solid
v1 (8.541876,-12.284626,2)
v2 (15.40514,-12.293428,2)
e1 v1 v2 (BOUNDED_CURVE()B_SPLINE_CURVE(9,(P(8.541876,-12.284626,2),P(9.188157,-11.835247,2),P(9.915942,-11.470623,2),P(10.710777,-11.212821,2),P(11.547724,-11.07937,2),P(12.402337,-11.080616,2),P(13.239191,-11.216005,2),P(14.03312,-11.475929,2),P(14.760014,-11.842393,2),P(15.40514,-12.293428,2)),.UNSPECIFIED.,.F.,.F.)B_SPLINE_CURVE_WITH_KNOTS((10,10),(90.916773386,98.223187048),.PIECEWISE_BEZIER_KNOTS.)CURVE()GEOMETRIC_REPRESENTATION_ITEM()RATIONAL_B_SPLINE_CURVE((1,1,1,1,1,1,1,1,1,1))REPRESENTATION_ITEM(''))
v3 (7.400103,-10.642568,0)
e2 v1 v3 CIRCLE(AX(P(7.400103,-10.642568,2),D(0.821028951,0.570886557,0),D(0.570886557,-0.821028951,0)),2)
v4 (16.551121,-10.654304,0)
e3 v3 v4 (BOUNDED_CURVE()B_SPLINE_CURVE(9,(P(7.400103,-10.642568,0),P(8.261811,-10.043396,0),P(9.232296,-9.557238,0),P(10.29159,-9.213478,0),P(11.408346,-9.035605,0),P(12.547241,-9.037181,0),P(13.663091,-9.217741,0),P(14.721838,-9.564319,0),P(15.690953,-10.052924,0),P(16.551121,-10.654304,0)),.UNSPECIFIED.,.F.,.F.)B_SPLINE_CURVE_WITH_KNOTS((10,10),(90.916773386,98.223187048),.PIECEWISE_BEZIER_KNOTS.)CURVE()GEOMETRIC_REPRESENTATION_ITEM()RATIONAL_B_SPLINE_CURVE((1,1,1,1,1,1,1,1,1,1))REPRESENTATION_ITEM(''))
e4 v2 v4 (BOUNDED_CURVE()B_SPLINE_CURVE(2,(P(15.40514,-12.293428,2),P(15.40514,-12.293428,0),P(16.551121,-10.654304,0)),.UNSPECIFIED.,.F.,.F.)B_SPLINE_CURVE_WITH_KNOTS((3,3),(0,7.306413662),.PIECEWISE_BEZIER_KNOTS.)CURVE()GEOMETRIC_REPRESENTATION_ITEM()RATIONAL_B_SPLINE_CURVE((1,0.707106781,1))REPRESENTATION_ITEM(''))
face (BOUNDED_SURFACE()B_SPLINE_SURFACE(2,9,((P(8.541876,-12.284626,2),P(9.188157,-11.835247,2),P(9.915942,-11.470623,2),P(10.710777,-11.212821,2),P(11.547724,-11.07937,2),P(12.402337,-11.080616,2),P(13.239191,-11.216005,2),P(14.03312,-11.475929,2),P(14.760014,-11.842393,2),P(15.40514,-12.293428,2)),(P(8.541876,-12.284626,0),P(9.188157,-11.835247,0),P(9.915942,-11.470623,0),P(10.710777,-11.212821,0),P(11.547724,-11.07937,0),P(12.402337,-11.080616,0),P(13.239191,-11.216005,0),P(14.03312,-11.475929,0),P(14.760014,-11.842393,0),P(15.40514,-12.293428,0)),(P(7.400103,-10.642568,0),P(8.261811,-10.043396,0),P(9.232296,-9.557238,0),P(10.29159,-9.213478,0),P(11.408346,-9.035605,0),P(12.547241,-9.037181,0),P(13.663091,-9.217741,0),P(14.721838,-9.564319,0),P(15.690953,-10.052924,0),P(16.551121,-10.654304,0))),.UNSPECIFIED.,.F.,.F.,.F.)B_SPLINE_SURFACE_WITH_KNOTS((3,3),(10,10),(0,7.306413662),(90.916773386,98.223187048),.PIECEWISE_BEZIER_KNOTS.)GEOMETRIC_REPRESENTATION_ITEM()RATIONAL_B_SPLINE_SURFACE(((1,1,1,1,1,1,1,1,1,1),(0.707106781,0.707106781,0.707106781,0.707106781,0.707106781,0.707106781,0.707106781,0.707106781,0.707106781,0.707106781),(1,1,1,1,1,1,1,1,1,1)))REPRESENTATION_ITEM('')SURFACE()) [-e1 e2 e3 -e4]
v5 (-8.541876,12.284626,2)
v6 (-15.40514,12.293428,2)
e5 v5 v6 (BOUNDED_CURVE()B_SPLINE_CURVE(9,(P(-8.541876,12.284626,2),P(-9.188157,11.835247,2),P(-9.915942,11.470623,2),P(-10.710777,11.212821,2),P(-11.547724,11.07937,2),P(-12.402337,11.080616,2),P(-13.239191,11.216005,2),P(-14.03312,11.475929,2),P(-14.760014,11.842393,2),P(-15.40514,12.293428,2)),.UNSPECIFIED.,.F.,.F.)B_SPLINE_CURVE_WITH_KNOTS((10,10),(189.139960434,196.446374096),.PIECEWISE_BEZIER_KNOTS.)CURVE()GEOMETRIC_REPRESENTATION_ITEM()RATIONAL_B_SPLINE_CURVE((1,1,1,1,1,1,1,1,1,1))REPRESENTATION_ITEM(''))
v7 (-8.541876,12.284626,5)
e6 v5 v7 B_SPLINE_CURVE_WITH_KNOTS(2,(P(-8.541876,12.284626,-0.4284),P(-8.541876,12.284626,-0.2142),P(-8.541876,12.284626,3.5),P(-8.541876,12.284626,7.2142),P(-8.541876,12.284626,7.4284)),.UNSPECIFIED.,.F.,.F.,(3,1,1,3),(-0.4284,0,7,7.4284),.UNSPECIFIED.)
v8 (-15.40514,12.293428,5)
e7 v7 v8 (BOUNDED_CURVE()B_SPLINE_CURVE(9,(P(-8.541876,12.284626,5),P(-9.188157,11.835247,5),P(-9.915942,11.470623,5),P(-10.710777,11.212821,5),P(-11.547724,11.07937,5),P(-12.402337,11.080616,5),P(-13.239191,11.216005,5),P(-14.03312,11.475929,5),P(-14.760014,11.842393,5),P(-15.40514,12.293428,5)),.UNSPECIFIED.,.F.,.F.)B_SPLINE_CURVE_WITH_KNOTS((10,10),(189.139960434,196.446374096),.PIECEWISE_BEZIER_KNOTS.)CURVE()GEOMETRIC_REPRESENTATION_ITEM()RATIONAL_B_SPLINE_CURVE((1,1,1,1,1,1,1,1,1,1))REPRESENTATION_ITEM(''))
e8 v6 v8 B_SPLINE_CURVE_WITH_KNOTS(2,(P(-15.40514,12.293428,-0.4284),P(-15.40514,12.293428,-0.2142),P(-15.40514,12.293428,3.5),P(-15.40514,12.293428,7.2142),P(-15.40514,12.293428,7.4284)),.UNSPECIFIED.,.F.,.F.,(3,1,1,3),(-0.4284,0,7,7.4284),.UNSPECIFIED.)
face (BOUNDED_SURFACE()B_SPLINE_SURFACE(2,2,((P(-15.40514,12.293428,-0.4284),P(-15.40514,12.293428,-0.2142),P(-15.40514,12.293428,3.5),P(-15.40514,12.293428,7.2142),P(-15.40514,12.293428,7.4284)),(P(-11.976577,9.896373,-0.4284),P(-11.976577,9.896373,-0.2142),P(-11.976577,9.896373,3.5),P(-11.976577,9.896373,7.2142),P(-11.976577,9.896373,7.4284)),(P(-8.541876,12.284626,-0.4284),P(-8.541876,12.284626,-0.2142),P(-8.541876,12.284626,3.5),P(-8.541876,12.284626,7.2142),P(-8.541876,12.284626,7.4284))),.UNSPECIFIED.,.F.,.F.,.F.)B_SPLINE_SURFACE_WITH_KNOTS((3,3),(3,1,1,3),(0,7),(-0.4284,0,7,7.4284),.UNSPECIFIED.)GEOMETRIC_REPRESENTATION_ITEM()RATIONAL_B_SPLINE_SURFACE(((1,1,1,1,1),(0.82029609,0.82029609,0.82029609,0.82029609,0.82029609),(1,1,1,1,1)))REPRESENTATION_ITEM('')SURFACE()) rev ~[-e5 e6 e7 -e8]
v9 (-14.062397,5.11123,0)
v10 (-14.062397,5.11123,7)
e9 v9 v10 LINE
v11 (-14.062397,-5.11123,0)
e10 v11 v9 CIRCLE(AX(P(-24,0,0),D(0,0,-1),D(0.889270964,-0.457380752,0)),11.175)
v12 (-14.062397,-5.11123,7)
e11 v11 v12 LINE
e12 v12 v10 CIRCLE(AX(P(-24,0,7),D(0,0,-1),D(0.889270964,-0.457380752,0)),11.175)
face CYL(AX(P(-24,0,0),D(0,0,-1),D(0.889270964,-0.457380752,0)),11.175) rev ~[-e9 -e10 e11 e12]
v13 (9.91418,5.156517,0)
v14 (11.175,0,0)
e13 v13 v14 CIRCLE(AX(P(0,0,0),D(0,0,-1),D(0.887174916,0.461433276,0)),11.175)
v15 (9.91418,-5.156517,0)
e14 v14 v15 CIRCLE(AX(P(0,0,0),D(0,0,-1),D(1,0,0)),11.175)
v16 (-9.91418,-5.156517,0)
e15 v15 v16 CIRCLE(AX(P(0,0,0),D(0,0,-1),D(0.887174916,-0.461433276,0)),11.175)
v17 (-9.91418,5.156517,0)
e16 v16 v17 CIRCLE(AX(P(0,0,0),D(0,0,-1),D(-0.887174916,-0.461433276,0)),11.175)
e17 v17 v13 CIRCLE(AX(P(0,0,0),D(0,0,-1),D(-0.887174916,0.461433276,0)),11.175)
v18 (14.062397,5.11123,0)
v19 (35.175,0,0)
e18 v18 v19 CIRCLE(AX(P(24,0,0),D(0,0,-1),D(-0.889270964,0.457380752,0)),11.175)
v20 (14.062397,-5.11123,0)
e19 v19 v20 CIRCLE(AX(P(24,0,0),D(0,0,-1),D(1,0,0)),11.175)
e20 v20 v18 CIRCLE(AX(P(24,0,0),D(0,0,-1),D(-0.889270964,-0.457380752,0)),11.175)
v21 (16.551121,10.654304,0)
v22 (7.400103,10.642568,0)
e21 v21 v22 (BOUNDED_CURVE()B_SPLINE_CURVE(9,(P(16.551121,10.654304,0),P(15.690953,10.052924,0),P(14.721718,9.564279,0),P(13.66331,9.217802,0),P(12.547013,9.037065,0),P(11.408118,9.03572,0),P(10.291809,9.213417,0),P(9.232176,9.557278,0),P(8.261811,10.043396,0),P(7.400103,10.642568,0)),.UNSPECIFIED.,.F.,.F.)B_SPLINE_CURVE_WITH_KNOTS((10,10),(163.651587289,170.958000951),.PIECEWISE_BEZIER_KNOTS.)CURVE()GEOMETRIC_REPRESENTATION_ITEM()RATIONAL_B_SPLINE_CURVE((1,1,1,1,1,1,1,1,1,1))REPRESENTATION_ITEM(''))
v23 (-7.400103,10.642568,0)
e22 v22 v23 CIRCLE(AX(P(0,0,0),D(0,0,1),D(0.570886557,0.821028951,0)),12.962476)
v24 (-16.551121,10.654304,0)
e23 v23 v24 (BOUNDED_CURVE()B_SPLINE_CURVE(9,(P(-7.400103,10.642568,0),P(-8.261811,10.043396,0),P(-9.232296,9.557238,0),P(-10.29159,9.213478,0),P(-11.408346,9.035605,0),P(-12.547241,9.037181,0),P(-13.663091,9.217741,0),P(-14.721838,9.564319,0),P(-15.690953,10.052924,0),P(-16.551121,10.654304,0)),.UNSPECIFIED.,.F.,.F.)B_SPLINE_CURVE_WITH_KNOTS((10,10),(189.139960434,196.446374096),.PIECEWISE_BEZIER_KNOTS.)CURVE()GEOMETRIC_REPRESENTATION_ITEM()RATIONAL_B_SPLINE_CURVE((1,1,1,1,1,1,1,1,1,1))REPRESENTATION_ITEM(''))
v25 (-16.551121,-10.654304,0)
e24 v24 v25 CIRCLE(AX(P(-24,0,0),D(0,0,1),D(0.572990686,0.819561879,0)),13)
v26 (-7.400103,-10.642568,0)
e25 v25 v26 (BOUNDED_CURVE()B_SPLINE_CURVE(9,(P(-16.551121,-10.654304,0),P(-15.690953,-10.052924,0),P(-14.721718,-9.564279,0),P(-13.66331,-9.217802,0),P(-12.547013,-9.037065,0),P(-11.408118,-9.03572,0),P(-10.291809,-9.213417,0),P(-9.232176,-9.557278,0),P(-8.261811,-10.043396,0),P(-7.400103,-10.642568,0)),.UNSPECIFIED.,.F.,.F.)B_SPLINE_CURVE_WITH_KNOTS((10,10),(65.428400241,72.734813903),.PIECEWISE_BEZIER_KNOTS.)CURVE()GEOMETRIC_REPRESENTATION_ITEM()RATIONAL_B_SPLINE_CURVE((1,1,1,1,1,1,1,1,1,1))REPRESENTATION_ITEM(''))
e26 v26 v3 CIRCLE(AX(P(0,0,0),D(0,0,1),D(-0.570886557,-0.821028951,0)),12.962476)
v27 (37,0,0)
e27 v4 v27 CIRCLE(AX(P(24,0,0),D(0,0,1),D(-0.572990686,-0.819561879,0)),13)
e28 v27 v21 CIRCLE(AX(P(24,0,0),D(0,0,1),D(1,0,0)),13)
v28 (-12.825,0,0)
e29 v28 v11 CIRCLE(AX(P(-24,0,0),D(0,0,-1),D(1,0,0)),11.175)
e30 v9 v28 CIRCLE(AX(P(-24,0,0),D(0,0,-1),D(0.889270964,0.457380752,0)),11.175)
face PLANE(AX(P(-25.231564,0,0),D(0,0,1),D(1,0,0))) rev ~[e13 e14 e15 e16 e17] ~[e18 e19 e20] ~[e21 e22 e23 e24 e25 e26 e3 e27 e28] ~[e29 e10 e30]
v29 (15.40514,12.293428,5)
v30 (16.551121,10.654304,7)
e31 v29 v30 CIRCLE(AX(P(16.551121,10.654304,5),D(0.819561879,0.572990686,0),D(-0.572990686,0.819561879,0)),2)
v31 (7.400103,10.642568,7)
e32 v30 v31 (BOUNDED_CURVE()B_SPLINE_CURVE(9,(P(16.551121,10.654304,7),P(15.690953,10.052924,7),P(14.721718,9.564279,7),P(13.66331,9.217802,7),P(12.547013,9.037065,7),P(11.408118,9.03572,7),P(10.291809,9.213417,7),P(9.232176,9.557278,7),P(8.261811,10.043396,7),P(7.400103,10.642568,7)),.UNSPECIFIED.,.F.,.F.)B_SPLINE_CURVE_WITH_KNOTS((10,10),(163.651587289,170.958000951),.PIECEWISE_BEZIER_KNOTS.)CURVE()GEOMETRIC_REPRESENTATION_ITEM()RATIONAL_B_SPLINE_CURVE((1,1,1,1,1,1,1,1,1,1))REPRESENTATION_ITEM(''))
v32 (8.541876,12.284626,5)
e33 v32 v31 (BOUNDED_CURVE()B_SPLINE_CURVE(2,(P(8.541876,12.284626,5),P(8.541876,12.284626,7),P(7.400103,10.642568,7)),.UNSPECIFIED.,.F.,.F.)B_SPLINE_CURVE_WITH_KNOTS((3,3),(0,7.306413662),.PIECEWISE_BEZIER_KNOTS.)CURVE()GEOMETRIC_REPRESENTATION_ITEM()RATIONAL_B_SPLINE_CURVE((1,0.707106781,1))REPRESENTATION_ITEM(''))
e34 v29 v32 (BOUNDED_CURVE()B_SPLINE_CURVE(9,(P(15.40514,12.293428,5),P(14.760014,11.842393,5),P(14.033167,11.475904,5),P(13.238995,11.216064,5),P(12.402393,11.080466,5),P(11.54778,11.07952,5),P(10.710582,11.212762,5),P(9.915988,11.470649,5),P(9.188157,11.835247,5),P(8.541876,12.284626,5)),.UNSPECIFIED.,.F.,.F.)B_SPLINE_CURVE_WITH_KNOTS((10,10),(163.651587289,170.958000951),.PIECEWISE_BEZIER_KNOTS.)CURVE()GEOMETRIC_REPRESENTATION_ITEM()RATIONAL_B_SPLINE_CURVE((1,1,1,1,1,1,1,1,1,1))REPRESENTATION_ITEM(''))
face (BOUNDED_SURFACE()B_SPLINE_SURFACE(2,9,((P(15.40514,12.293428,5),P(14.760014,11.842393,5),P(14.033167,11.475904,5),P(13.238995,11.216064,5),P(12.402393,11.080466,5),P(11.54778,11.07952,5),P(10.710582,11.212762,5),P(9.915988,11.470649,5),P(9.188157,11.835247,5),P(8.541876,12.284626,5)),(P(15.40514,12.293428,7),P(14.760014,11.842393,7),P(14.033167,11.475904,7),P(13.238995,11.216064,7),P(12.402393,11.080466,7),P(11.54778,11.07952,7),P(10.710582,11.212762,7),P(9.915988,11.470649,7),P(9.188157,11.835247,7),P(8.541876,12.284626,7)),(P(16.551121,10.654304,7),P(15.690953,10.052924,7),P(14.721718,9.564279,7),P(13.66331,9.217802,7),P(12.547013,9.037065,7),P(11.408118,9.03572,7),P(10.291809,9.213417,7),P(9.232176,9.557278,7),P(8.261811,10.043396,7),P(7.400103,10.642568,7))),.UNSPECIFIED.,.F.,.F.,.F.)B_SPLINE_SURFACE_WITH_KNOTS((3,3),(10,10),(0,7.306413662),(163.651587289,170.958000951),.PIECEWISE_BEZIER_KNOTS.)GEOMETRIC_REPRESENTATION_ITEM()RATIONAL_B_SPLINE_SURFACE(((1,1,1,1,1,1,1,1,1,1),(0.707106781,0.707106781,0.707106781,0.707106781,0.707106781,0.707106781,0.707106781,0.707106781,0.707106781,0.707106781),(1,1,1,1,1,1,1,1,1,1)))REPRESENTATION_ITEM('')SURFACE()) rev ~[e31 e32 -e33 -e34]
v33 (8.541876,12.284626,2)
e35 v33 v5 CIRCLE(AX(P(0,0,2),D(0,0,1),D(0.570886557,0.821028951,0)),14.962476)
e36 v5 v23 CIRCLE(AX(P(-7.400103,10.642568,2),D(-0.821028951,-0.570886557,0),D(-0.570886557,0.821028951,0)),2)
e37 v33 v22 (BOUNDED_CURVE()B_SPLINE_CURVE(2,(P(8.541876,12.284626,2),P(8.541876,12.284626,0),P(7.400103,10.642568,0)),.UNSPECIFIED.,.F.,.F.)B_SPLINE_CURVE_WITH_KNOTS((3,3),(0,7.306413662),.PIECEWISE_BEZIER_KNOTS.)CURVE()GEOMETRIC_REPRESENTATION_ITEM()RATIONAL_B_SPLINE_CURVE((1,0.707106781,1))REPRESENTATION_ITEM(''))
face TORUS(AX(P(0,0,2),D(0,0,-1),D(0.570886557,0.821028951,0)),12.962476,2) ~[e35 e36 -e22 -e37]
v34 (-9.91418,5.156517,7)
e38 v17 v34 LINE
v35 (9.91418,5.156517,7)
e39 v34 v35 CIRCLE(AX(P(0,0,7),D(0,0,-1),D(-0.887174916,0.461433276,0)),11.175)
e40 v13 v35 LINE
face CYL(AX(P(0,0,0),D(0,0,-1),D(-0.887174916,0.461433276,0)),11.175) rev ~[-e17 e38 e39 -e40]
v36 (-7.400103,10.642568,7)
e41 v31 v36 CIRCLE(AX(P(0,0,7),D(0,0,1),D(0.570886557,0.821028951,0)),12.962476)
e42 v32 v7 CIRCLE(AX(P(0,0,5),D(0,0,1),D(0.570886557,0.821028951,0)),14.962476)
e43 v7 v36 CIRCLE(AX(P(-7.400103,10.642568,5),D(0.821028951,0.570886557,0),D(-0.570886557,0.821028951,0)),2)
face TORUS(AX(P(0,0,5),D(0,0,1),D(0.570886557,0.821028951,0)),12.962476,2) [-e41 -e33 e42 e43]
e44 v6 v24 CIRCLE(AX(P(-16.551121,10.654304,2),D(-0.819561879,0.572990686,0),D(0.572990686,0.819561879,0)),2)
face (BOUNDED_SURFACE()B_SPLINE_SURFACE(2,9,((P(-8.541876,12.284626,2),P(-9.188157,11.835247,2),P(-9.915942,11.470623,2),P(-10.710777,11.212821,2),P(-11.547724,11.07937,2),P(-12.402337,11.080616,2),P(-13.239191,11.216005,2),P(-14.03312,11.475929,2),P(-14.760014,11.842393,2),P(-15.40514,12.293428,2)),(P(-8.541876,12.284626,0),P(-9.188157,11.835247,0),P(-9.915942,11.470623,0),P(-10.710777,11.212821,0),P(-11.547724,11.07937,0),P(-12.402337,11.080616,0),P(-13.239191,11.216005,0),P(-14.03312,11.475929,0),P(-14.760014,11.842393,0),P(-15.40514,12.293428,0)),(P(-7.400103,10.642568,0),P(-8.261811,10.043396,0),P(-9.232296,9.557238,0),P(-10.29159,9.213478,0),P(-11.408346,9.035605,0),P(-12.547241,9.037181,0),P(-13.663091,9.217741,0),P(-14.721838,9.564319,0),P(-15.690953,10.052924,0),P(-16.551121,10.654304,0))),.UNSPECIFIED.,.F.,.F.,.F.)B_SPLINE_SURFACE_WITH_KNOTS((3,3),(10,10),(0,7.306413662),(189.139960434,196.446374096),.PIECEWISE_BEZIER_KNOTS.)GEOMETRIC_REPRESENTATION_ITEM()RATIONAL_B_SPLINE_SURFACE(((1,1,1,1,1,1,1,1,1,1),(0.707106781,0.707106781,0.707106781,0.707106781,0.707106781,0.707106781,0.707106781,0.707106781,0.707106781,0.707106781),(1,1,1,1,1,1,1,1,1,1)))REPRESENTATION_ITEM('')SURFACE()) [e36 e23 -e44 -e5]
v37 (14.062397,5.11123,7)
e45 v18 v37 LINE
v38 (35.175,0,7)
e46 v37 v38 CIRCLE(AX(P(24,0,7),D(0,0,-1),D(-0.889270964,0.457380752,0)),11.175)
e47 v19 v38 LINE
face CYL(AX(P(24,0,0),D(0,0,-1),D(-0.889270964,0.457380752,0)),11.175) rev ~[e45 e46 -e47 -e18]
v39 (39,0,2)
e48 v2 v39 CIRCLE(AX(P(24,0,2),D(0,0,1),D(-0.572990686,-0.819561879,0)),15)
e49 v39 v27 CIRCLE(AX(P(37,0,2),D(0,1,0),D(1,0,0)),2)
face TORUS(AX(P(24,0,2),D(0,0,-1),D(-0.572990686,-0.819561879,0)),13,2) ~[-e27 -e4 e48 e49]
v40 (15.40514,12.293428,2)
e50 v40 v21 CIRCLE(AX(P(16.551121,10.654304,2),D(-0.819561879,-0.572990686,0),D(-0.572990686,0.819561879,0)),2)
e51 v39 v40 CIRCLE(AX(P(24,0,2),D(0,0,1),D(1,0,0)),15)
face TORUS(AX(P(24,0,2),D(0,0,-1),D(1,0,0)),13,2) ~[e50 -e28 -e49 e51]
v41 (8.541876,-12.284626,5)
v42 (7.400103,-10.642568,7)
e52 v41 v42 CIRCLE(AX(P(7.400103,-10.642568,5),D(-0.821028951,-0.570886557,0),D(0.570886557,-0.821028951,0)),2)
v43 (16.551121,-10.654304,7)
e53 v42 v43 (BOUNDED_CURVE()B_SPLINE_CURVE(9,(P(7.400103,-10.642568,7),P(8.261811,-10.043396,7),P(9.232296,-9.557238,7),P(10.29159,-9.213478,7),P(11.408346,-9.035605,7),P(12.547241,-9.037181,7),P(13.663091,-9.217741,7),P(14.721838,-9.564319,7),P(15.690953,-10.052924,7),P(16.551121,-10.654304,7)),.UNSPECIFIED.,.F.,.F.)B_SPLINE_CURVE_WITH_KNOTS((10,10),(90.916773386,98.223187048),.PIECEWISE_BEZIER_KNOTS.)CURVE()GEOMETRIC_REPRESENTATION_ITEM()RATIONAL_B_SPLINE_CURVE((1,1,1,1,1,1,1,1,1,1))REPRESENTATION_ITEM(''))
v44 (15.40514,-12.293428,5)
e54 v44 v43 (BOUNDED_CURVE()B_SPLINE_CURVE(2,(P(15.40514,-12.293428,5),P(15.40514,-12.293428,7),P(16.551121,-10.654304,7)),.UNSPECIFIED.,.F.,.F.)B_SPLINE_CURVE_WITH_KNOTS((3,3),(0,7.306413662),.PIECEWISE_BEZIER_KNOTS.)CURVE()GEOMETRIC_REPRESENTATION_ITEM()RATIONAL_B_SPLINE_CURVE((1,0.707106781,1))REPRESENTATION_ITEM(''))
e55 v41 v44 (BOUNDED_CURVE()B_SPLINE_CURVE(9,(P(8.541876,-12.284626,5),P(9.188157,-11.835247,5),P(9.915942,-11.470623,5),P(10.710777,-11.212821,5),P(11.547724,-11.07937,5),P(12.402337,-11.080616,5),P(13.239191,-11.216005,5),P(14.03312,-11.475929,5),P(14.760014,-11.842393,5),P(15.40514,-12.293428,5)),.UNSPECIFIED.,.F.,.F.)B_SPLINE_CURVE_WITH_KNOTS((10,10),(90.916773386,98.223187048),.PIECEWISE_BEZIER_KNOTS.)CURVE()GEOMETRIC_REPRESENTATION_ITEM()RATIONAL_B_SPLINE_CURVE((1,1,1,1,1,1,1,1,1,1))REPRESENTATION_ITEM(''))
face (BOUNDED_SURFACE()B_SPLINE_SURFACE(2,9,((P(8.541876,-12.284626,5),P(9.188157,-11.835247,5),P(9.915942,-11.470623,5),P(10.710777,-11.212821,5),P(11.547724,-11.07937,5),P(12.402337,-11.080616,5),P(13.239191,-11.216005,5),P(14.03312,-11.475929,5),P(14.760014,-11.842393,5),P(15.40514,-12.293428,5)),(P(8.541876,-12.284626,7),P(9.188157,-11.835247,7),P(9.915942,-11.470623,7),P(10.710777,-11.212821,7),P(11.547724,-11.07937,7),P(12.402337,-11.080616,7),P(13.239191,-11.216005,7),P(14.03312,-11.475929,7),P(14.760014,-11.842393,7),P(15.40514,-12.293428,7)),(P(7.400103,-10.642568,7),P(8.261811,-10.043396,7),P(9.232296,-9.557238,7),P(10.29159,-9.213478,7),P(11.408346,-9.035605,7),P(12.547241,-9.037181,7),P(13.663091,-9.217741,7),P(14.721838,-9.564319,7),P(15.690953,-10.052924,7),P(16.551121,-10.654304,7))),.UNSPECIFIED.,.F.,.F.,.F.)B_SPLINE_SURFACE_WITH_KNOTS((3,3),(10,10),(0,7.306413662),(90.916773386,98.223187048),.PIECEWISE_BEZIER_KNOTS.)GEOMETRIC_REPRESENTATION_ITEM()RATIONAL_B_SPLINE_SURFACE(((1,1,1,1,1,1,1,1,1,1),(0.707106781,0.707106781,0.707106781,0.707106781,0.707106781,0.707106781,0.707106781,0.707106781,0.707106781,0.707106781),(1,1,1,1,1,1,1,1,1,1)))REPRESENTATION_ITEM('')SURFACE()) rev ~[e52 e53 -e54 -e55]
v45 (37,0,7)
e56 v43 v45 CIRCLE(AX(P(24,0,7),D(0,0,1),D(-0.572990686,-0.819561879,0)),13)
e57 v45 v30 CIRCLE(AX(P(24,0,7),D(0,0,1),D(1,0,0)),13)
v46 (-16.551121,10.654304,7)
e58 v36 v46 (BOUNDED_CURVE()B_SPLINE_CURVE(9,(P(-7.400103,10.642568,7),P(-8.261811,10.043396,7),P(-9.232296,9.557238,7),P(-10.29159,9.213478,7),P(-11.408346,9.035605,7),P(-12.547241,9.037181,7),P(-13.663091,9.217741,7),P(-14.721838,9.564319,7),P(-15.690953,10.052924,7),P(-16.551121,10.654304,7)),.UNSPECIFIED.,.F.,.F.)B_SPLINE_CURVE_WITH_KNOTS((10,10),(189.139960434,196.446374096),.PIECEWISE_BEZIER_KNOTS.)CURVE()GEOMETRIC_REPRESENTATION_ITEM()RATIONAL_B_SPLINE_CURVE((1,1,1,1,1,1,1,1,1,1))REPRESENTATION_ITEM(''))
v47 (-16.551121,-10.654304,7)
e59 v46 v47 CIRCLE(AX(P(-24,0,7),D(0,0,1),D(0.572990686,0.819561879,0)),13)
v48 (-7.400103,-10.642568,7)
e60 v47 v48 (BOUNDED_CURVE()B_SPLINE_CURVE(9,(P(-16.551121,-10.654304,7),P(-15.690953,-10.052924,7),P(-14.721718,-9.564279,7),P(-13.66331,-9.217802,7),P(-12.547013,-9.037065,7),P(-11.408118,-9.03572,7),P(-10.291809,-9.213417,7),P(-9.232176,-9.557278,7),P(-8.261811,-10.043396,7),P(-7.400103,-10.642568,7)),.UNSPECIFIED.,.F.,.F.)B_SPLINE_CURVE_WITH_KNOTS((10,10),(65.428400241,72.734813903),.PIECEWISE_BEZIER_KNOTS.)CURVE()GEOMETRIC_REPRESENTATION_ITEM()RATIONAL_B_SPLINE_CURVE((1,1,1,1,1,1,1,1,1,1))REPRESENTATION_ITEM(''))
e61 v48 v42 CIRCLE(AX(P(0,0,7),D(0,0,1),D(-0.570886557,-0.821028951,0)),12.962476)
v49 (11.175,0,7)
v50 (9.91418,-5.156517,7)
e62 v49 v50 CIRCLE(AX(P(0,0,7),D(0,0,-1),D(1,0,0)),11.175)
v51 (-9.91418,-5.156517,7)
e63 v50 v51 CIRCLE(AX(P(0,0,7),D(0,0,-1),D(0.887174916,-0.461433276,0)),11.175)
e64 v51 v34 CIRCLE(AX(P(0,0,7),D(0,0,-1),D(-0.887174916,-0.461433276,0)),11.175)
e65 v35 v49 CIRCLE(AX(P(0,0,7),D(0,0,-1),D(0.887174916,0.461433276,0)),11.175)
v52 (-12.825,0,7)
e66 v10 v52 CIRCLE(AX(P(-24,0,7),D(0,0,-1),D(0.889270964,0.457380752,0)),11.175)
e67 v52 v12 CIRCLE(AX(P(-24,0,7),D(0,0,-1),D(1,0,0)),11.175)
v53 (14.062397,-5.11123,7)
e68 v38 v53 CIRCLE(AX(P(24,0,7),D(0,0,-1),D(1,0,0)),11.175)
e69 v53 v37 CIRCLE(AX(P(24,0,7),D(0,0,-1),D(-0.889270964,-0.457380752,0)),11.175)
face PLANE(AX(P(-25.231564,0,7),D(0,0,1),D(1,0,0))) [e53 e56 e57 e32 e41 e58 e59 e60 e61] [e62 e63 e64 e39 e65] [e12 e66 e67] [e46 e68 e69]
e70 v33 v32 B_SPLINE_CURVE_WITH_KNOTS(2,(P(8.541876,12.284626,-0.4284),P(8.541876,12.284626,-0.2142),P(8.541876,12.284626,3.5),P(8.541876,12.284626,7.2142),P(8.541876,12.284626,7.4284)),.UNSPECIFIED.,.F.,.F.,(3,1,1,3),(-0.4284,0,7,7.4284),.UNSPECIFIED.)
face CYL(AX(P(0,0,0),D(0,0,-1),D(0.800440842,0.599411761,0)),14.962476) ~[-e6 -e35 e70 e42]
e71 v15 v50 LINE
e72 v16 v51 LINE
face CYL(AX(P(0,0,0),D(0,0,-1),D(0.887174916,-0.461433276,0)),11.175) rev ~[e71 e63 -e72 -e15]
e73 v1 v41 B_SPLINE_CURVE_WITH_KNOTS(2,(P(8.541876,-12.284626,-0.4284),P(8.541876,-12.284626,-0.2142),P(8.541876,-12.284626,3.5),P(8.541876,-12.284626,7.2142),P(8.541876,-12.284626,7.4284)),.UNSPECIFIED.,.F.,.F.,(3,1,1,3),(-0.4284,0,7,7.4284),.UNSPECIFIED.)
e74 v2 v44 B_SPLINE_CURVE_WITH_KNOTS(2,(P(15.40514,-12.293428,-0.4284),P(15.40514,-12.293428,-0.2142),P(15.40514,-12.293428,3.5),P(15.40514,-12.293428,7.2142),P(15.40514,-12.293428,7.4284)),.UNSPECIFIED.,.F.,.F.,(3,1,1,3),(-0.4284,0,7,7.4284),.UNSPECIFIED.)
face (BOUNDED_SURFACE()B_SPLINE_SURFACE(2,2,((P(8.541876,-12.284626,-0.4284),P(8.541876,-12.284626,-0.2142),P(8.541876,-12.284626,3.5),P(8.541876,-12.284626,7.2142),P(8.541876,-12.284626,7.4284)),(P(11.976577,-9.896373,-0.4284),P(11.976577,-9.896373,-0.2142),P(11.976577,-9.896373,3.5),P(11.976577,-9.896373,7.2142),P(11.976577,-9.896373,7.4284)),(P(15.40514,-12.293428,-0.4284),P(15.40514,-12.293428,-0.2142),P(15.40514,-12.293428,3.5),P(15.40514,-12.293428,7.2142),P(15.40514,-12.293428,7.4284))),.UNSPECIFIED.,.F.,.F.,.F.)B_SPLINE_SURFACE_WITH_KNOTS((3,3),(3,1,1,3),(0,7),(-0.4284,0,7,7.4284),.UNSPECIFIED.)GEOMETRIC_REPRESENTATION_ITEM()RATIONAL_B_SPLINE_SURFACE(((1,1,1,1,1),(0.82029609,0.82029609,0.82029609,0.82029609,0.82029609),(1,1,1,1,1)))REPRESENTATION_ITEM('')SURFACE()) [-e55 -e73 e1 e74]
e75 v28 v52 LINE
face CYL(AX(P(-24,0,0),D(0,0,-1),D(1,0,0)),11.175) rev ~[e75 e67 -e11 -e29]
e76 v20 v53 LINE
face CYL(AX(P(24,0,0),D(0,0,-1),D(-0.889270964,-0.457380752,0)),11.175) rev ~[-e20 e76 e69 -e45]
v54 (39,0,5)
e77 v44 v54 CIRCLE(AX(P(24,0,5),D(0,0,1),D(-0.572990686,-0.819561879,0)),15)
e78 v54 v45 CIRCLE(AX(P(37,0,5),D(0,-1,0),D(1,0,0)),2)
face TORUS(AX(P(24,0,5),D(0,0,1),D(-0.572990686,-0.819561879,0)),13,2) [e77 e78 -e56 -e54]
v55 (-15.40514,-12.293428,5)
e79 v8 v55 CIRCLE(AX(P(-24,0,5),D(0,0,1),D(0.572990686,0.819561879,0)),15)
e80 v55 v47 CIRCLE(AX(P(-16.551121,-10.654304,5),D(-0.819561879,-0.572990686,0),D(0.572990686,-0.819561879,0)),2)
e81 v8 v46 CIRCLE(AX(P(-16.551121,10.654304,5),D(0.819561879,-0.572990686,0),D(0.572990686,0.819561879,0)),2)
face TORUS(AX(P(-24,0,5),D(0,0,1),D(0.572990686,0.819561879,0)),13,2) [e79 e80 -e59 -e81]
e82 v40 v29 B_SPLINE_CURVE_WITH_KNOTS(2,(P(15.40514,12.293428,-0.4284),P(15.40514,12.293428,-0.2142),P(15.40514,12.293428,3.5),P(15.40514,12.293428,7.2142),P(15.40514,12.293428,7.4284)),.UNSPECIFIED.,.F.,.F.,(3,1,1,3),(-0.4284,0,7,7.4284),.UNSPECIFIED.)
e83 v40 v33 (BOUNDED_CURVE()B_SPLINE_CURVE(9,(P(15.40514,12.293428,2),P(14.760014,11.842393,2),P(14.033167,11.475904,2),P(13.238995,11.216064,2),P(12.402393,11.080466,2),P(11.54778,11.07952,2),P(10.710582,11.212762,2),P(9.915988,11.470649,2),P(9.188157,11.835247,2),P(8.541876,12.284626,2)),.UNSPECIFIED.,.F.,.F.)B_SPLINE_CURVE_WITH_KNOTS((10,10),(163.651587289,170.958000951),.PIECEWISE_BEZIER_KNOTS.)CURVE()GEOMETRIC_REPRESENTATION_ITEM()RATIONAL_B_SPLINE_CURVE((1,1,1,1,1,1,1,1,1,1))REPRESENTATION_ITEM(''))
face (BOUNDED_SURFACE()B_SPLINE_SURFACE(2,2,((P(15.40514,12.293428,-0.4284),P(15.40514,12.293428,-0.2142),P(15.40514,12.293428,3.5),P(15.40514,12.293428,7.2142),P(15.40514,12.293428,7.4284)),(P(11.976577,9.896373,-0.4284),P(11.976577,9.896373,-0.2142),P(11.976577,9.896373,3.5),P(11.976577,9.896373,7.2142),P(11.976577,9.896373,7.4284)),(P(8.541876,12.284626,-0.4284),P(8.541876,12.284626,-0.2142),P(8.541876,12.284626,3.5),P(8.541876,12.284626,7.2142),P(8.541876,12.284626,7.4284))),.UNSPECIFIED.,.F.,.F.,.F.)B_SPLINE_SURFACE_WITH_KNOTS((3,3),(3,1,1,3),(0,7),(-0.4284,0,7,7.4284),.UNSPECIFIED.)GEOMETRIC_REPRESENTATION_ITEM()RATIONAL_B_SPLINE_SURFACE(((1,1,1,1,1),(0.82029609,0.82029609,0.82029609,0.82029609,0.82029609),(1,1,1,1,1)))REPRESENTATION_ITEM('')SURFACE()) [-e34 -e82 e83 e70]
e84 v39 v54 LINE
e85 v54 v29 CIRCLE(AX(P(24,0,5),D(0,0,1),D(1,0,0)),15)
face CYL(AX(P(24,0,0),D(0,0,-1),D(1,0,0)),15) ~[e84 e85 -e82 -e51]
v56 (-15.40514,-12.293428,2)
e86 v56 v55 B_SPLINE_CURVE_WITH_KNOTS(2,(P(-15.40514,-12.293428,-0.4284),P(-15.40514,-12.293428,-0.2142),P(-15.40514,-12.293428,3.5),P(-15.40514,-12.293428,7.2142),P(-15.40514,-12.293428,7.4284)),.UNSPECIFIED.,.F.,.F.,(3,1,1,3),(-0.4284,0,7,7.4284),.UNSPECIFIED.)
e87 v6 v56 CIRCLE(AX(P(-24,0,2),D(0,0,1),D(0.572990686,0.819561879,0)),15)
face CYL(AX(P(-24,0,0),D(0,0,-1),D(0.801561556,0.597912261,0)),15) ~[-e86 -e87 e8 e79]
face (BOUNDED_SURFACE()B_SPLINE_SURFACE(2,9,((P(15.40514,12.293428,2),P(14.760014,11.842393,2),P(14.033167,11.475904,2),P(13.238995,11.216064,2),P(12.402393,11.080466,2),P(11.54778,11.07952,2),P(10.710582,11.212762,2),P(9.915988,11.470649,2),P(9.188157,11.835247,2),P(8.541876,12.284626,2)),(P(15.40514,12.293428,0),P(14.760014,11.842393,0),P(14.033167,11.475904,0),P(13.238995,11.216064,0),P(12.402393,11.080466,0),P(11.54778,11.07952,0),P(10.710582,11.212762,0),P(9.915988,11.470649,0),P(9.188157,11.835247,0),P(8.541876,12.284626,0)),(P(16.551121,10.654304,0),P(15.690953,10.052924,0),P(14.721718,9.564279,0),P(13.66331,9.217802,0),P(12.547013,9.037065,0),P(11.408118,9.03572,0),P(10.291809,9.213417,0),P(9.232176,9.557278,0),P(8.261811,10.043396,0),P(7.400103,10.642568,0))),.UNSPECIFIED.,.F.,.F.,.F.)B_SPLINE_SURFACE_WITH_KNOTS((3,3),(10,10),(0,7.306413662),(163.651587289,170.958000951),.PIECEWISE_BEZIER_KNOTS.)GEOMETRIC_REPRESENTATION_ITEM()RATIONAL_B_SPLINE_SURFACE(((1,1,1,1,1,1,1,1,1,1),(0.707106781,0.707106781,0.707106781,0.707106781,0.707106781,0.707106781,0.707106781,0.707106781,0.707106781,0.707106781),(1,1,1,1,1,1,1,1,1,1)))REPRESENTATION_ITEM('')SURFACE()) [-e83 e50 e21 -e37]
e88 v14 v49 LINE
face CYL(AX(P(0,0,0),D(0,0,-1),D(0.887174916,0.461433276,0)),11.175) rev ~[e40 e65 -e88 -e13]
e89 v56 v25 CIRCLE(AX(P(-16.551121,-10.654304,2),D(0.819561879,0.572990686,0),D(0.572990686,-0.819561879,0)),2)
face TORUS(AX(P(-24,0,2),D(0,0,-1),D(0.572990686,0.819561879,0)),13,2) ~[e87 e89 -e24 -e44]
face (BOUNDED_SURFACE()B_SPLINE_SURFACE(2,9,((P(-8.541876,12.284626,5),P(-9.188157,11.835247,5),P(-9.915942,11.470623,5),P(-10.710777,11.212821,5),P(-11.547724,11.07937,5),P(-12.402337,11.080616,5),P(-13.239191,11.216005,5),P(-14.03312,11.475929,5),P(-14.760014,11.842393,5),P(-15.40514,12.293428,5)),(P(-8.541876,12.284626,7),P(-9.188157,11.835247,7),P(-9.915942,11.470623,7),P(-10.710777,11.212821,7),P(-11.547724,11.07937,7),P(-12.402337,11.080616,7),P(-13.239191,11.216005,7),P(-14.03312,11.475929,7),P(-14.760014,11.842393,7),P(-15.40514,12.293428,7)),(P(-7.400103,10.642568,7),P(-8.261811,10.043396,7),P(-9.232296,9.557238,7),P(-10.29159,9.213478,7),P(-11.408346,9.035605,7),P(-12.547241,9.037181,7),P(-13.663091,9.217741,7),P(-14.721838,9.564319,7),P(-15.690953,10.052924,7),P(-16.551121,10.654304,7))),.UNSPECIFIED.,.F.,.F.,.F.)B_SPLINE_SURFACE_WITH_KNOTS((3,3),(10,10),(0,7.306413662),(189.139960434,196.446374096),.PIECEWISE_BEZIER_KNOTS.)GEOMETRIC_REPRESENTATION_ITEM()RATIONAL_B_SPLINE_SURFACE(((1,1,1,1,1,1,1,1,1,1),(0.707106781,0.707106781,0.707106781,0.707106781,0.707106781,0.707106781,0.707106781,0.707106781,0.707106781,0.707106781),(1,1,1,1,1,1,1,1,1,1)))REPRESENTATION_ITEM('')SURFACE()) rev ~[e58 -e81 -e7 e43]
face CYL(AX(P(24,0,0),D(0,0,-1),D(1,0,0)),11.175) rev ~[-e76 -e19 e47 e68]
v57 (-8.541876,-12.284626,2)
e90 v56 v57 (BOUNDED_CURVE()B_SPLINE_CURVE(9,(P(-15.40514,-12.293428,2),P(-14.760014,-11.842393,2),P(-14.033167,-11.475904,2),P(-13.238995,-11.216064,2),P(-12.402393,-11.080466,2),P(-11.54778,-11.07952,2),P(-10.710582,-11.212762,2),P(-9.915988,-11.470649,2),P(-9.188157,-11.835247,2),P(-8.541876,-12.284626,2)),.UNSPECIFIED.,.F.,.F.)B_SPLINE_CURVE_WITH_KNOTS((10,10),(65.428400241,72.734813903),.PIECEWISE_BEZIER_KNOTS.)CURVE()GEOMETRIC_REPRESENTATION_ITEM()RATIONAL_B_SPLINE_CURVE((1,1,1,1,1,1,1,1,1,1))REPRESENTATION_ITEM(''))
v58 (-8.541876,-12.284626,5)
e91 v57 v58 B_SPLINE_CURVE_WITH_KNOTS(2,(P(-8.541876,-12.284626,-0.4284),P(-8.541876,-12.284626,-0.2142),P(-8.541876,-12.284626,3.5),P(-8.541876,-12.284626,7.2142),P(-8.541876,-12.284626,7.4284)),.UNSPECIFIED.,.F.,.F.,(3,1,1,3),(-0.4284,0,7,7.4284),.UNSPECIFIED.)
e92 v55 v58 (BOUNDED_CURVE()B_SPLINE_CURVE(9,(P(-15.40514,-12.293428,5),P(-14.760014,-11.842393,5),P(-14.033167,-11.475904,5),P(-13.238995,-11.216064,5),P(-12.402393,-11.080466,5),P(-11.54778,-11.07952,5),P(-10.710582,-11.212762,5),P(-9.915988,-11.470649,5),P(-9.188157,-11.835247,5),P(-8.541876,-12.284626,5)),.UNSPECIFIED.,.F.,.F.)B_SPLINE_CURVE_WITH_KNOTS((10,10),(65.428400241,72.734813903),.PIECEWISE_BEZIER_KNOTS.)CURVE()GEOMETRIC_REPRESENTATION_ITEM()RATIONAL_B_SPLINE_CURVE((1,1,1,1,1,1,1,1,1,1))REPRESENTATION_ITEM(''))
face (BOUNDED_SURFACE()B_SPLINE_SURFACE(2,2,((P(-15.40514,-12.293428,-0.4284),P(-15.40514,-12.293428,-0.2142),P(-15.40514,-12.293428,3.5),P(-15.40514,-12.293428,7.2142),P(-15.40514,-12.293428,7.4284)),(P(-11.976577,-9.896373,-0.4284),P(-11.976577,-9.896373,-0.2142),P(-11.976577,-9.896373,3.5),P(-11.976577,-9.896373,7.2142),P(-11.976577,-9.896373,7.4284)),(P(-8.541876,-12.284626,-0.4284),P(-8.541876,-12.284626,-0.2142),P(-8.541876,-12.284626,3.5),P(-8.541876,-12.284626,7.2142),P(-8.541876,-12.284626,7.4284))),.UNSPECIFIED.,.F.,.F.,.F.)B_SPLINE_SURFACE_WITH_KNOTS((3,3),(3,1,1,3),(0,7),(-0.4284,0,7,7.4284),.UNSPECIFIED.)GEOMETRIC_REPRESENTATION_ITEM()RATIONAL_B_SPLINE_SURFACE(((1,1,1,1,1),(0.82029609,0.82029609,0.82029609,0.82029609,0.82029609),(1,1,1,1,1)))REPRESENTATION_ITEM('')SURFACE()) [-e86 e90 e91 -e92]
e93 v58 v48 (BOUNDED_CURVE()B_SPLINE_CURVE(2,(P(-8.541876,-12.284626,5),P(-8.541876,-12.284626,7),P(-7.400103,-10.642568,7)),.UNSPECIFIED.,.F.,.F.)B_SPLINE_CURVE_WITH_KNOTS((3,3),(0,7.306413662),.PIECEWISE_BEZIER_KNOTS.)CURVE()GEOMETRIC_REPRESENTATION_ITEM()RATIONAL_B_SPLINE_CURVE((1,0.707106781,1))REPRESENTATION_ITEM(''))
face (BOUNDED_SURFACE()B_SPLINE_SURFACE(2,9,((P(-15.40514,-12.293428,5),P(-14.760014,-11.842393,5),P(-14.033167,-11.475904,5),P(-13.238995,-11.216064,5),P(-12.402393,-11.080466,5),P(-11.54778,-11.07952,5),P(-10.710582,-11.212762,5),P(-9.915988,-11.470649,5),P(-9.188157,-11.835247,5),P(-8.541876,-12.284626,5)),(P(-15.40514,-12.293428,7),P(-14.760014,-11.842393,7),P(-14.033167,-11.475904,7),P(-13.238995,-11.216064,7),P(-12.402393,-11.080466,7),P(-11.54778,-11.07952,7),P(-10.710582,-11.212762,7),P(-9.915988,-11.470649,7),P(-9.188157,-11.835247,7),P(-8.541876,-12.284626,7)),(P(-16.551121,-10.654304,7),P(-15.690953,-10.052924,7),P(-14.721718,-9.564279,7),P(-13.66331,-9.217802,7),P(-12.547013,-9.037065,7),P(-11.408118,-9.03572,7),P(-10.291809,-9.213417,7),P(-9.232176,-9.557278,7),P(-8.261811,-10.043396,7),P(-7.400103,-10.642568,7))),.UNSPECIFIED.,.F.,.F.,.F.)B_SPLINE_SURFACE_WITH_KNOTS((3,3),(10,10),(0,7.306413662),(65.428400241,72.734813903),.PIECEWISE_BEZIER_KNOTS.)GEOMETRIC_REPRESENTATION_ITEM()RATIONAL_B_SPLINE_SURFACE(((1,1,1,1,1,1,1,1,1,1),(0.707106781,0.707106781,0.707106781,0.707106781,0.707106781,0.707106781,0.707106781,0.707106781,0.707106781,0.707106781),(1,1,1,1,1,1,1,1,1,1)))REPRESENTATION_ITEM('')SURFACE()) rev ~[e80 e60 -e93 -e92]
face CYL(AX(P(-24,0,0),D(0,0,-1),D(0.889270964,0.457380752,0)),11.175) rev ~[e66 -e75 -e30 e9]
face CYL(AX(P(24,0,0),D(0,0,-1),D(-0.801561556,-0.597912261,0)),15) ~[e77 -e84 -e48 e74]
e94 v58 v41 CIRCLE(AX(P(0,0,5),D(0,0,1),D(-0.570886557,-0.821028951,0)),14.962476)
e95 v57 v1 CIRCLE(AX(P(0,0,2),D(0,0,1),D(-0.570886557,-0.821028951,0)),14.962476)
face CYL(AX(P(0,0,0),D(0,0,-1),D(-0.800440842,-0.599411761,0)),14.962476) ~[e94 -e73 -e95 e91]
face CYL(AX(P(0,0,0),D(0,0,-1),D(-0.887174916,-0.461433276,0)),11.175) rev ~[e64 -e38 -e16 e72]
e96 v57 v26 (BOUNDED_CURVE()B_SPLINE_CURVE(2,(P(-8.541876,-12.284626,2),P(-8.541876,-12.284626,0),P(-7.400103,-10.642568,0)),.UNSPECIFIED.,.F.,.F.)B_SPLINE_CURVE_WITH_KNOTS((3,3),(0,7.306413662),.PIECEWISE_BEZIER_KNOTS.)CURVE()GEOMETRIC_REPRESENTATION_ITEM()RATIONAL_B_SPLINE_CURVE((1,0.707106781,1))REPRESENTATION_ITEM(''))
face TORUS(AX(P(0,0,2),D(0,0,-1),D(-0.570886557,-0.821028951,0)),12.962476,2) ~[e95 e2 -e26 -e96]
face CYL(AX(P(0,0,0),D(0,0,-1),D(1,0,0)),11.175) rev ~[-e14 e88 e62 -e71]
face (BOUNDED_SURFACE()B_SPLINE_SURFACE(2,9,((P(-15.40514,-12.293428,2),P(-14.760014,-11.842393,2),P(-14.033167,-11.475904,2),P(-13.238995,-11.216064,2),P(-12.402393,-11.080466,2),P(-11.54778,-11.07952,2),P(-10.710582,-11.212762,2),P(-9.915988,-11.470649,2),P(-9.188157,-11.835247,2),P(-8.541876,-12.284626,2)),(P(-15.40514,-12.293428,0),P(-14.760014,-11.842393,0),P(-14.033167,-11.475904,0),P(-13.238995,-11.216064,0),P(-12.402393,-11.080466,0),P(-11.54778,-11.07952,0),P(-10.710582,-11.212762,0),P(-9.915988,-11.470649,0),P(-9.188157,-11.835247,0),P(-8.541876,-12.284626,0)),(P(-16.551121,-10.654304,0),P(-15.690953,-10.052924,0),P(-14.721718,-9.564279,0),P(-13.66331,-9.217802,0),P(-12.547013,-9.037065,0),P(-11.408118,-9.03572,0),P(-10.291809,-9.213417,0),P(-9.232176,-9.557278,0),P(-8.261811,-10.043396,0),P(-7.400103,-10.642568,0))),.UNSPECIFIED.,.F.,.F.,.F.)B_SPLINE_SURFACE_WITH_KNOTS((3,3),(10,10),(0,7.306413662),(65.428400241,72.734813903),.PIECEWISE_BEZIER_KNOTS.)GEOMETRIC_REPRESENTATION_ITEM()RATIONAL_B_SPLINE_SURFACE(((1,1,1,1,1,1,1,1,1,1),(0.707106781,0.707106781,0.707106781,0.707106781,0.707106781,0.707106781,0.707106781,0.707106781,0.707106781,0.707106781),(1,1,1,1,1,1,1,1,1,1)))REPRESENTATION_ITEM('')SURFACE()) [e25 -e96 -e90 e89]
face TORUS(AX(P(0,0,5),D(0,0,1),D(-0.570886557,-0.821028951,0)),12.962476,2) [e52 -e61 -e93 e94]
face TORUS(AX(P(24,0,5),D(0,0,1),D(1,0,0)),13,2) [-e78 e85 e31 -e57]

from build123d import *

# Parameters (mm, degrees)
F1_DEPTH = 7
F2_R     = 6
F3_R     = 2


# Not quite as in the source:
# - a feature names something its author has since deleted; it is built from what else it names


with BuildPart() as f1:
    # F0 (on Top) → F1 (new body)
    with BuildSketch(Plane.XY):
        with BuildLine():
            ThreePointArc((-14.0623969756, 5.1112299037), (-13.1615738007, 7.1167868393), (-11.9765766631, 8.9686839202))
            ThreePointArc((-11.9765766631, 8.9686839202), (-39, 0), (-11.9765766631, -8.9686839202))
            ThreePointArc((-11.9765766631, -8.9686839202), (-13.1615738007, -7.1167868393), (-14.0623969756, -5.1112299037))
            ThreePointArc((-14.0623969756, -5.1112299037), (-35.175, 0), (-14.0623969756, 5.1112299037))
        make_face()
        with BuildLine():
            ThreePointArc((-9.9141796875, -5.1565168597), (-11.175, 0), (-9.9141796875, 5.1565168597))
            ThreePointArc((-9.9141796875, 5.1565168597), (-10.8069599633, 7.1374851726), (-11.9765766631, 8.9686839202))
            ThreePointArc((-11.9765766631, 8.9686839202), (-13.1615738007, 7.1167868393), (-14.0623969756, 5.1112299037))
            ThreePointArc((-14.0623969756, 5.1112299037), (-13.1387537824, 2.6294401687), (-12.825, 0))
            ThreePointArc((-12.825, 0), (-13.1387537824, -2.6294401687), (-14.0623969756, -5.1112299037))
            ThreePointArc((-14.0623969756, -5.1112299037), (-13.1615738007, -7.1167868393), (-11.9765766631, -8.9686839202))
            ThreePointArc((-11.9765766631, -8.9686839202), (-10.8069599633, -7.1374851726), (-9.9141796875, -5.1565168597))
        make_face()
        with BuildLine():
            ThreePointArc((-9.9141796875, 5.1565168597), (0, 11.175), (9.9141796875, 5.1565168597))
            ThreePointArc((9.9141796875, 5.1565168597), (10.8069599633, 7.1374851726), (11.9765766631, 8.9686839202))
            ThreePointArc((11.9765766631, 8.9686839202), (0, 14.9624757252), (-11.9765766631, 8.9686839202))
            ThreePointArc((-11.9765766631, 8.9686839202), (-10.8069599633, 7.1374851726), (-9.9141796875, 5.1565168597))
        make_face()
        with BuildLine():
            ThreePointArc((9.9141796875, 5.1565168597), (10.8552195512, 2.6542105222), (11.175, 0))
            ThreePointArc((11.175, 0), (10.8552195512, -2.6542105222), (9.9141796875, -5.1565168597))
            ThreePointArc((9.9141796875, -5.1565168597), (10.8069599633, -7.1374851726), (11.9765766631, -8.9686839202))
            ThreePointArc((11.9765766631, -8.9686839202), (13.1615738007, -7.1167868393), (14.0623969756, -5.1112299037))
            ThreePointArc((14.0623969756, -5.1112299037), (12.825, 0), (14.0623969756, 5.1112299037))
            ThreePointArc((14.0623969756, 5.1112299037), (13.1615738007, 7.1167868393), (11.9765766631, 8.9686839202))
            ThreePointArc((11.9765766631, 8.9686839202), (10.8069599633, 7.1374851726), (9.9141796875, 5.1565168597))
        make_face()
        with BuildLine():
            ThreePointArc((39, 0), (28.724862429, 14.2364207239), (11.9765766631, 8.9686839202))
            ThreePointArc((11.9765766631, 8.9686839202), (13.1615738007, 7.1167868393), (14.0623969756, 5.1112299037))
            ThreePointArc((14.0623969756, 5.1112299037), (26.6294401687, 10.8612462176), (35.175, 0))
            ThreePointArc((35.175, 0), (26.6294401687, -10.8612462176), (14.0623969756, -5.1112299037))
            ThreePointArc((14.0623969756, -5.1112299037), (13.1615738007, -7.1167868393), (11.9765766631, -8.9686839202))
            ThreePointArc((11.9765766631, -8.9686839202), (28.724862429, -14.2364207239), (39, 0))
        make_face()
        with BuildLine():
            ThreePointArc((11.9765766631, -8.9686839202), (10.8069599633, -7.1374851726), (9.9141796875, -5.1565168597))
            ThreePointArc((9.9141796875, -5.1565168597), (0, -11.175), (-9.9141796875, -5.1565168597))
            ThreePointArc((-9.9141796875, -5.1565168597), (-10.8069599633, -7.1374851726), (-11.9765766631, -8.9686839202))
            ThreePointArc((-11.9765766631, -8.9686839202), (0, -14.9624757252), (11.9765766631, -8.9686839202))
        make_face()
    extrude(amount=F1_DEPTH)

    # F2
    f2_edges = [f1.edges().sort_by_distance(p)[0] for p in [
        (-11.976577, -8.968684, 3.5),
        (11.976577, -8.968684, 3.5),
        (11.976577, 8.968684, 3.5),
        (-11.976577, 8.968684, 3.5),
    ]]
    fillet(f2_edges, radius=F2_R)

    # F3
    f3_edges = [f1.edges().sort_by_distance(p)[0] for p in [
        (-39, 0, 7),
        (-39, 0, 0),
    ]]
    fillet(f3_edges, radius=F3_R)


solid = f1.part
